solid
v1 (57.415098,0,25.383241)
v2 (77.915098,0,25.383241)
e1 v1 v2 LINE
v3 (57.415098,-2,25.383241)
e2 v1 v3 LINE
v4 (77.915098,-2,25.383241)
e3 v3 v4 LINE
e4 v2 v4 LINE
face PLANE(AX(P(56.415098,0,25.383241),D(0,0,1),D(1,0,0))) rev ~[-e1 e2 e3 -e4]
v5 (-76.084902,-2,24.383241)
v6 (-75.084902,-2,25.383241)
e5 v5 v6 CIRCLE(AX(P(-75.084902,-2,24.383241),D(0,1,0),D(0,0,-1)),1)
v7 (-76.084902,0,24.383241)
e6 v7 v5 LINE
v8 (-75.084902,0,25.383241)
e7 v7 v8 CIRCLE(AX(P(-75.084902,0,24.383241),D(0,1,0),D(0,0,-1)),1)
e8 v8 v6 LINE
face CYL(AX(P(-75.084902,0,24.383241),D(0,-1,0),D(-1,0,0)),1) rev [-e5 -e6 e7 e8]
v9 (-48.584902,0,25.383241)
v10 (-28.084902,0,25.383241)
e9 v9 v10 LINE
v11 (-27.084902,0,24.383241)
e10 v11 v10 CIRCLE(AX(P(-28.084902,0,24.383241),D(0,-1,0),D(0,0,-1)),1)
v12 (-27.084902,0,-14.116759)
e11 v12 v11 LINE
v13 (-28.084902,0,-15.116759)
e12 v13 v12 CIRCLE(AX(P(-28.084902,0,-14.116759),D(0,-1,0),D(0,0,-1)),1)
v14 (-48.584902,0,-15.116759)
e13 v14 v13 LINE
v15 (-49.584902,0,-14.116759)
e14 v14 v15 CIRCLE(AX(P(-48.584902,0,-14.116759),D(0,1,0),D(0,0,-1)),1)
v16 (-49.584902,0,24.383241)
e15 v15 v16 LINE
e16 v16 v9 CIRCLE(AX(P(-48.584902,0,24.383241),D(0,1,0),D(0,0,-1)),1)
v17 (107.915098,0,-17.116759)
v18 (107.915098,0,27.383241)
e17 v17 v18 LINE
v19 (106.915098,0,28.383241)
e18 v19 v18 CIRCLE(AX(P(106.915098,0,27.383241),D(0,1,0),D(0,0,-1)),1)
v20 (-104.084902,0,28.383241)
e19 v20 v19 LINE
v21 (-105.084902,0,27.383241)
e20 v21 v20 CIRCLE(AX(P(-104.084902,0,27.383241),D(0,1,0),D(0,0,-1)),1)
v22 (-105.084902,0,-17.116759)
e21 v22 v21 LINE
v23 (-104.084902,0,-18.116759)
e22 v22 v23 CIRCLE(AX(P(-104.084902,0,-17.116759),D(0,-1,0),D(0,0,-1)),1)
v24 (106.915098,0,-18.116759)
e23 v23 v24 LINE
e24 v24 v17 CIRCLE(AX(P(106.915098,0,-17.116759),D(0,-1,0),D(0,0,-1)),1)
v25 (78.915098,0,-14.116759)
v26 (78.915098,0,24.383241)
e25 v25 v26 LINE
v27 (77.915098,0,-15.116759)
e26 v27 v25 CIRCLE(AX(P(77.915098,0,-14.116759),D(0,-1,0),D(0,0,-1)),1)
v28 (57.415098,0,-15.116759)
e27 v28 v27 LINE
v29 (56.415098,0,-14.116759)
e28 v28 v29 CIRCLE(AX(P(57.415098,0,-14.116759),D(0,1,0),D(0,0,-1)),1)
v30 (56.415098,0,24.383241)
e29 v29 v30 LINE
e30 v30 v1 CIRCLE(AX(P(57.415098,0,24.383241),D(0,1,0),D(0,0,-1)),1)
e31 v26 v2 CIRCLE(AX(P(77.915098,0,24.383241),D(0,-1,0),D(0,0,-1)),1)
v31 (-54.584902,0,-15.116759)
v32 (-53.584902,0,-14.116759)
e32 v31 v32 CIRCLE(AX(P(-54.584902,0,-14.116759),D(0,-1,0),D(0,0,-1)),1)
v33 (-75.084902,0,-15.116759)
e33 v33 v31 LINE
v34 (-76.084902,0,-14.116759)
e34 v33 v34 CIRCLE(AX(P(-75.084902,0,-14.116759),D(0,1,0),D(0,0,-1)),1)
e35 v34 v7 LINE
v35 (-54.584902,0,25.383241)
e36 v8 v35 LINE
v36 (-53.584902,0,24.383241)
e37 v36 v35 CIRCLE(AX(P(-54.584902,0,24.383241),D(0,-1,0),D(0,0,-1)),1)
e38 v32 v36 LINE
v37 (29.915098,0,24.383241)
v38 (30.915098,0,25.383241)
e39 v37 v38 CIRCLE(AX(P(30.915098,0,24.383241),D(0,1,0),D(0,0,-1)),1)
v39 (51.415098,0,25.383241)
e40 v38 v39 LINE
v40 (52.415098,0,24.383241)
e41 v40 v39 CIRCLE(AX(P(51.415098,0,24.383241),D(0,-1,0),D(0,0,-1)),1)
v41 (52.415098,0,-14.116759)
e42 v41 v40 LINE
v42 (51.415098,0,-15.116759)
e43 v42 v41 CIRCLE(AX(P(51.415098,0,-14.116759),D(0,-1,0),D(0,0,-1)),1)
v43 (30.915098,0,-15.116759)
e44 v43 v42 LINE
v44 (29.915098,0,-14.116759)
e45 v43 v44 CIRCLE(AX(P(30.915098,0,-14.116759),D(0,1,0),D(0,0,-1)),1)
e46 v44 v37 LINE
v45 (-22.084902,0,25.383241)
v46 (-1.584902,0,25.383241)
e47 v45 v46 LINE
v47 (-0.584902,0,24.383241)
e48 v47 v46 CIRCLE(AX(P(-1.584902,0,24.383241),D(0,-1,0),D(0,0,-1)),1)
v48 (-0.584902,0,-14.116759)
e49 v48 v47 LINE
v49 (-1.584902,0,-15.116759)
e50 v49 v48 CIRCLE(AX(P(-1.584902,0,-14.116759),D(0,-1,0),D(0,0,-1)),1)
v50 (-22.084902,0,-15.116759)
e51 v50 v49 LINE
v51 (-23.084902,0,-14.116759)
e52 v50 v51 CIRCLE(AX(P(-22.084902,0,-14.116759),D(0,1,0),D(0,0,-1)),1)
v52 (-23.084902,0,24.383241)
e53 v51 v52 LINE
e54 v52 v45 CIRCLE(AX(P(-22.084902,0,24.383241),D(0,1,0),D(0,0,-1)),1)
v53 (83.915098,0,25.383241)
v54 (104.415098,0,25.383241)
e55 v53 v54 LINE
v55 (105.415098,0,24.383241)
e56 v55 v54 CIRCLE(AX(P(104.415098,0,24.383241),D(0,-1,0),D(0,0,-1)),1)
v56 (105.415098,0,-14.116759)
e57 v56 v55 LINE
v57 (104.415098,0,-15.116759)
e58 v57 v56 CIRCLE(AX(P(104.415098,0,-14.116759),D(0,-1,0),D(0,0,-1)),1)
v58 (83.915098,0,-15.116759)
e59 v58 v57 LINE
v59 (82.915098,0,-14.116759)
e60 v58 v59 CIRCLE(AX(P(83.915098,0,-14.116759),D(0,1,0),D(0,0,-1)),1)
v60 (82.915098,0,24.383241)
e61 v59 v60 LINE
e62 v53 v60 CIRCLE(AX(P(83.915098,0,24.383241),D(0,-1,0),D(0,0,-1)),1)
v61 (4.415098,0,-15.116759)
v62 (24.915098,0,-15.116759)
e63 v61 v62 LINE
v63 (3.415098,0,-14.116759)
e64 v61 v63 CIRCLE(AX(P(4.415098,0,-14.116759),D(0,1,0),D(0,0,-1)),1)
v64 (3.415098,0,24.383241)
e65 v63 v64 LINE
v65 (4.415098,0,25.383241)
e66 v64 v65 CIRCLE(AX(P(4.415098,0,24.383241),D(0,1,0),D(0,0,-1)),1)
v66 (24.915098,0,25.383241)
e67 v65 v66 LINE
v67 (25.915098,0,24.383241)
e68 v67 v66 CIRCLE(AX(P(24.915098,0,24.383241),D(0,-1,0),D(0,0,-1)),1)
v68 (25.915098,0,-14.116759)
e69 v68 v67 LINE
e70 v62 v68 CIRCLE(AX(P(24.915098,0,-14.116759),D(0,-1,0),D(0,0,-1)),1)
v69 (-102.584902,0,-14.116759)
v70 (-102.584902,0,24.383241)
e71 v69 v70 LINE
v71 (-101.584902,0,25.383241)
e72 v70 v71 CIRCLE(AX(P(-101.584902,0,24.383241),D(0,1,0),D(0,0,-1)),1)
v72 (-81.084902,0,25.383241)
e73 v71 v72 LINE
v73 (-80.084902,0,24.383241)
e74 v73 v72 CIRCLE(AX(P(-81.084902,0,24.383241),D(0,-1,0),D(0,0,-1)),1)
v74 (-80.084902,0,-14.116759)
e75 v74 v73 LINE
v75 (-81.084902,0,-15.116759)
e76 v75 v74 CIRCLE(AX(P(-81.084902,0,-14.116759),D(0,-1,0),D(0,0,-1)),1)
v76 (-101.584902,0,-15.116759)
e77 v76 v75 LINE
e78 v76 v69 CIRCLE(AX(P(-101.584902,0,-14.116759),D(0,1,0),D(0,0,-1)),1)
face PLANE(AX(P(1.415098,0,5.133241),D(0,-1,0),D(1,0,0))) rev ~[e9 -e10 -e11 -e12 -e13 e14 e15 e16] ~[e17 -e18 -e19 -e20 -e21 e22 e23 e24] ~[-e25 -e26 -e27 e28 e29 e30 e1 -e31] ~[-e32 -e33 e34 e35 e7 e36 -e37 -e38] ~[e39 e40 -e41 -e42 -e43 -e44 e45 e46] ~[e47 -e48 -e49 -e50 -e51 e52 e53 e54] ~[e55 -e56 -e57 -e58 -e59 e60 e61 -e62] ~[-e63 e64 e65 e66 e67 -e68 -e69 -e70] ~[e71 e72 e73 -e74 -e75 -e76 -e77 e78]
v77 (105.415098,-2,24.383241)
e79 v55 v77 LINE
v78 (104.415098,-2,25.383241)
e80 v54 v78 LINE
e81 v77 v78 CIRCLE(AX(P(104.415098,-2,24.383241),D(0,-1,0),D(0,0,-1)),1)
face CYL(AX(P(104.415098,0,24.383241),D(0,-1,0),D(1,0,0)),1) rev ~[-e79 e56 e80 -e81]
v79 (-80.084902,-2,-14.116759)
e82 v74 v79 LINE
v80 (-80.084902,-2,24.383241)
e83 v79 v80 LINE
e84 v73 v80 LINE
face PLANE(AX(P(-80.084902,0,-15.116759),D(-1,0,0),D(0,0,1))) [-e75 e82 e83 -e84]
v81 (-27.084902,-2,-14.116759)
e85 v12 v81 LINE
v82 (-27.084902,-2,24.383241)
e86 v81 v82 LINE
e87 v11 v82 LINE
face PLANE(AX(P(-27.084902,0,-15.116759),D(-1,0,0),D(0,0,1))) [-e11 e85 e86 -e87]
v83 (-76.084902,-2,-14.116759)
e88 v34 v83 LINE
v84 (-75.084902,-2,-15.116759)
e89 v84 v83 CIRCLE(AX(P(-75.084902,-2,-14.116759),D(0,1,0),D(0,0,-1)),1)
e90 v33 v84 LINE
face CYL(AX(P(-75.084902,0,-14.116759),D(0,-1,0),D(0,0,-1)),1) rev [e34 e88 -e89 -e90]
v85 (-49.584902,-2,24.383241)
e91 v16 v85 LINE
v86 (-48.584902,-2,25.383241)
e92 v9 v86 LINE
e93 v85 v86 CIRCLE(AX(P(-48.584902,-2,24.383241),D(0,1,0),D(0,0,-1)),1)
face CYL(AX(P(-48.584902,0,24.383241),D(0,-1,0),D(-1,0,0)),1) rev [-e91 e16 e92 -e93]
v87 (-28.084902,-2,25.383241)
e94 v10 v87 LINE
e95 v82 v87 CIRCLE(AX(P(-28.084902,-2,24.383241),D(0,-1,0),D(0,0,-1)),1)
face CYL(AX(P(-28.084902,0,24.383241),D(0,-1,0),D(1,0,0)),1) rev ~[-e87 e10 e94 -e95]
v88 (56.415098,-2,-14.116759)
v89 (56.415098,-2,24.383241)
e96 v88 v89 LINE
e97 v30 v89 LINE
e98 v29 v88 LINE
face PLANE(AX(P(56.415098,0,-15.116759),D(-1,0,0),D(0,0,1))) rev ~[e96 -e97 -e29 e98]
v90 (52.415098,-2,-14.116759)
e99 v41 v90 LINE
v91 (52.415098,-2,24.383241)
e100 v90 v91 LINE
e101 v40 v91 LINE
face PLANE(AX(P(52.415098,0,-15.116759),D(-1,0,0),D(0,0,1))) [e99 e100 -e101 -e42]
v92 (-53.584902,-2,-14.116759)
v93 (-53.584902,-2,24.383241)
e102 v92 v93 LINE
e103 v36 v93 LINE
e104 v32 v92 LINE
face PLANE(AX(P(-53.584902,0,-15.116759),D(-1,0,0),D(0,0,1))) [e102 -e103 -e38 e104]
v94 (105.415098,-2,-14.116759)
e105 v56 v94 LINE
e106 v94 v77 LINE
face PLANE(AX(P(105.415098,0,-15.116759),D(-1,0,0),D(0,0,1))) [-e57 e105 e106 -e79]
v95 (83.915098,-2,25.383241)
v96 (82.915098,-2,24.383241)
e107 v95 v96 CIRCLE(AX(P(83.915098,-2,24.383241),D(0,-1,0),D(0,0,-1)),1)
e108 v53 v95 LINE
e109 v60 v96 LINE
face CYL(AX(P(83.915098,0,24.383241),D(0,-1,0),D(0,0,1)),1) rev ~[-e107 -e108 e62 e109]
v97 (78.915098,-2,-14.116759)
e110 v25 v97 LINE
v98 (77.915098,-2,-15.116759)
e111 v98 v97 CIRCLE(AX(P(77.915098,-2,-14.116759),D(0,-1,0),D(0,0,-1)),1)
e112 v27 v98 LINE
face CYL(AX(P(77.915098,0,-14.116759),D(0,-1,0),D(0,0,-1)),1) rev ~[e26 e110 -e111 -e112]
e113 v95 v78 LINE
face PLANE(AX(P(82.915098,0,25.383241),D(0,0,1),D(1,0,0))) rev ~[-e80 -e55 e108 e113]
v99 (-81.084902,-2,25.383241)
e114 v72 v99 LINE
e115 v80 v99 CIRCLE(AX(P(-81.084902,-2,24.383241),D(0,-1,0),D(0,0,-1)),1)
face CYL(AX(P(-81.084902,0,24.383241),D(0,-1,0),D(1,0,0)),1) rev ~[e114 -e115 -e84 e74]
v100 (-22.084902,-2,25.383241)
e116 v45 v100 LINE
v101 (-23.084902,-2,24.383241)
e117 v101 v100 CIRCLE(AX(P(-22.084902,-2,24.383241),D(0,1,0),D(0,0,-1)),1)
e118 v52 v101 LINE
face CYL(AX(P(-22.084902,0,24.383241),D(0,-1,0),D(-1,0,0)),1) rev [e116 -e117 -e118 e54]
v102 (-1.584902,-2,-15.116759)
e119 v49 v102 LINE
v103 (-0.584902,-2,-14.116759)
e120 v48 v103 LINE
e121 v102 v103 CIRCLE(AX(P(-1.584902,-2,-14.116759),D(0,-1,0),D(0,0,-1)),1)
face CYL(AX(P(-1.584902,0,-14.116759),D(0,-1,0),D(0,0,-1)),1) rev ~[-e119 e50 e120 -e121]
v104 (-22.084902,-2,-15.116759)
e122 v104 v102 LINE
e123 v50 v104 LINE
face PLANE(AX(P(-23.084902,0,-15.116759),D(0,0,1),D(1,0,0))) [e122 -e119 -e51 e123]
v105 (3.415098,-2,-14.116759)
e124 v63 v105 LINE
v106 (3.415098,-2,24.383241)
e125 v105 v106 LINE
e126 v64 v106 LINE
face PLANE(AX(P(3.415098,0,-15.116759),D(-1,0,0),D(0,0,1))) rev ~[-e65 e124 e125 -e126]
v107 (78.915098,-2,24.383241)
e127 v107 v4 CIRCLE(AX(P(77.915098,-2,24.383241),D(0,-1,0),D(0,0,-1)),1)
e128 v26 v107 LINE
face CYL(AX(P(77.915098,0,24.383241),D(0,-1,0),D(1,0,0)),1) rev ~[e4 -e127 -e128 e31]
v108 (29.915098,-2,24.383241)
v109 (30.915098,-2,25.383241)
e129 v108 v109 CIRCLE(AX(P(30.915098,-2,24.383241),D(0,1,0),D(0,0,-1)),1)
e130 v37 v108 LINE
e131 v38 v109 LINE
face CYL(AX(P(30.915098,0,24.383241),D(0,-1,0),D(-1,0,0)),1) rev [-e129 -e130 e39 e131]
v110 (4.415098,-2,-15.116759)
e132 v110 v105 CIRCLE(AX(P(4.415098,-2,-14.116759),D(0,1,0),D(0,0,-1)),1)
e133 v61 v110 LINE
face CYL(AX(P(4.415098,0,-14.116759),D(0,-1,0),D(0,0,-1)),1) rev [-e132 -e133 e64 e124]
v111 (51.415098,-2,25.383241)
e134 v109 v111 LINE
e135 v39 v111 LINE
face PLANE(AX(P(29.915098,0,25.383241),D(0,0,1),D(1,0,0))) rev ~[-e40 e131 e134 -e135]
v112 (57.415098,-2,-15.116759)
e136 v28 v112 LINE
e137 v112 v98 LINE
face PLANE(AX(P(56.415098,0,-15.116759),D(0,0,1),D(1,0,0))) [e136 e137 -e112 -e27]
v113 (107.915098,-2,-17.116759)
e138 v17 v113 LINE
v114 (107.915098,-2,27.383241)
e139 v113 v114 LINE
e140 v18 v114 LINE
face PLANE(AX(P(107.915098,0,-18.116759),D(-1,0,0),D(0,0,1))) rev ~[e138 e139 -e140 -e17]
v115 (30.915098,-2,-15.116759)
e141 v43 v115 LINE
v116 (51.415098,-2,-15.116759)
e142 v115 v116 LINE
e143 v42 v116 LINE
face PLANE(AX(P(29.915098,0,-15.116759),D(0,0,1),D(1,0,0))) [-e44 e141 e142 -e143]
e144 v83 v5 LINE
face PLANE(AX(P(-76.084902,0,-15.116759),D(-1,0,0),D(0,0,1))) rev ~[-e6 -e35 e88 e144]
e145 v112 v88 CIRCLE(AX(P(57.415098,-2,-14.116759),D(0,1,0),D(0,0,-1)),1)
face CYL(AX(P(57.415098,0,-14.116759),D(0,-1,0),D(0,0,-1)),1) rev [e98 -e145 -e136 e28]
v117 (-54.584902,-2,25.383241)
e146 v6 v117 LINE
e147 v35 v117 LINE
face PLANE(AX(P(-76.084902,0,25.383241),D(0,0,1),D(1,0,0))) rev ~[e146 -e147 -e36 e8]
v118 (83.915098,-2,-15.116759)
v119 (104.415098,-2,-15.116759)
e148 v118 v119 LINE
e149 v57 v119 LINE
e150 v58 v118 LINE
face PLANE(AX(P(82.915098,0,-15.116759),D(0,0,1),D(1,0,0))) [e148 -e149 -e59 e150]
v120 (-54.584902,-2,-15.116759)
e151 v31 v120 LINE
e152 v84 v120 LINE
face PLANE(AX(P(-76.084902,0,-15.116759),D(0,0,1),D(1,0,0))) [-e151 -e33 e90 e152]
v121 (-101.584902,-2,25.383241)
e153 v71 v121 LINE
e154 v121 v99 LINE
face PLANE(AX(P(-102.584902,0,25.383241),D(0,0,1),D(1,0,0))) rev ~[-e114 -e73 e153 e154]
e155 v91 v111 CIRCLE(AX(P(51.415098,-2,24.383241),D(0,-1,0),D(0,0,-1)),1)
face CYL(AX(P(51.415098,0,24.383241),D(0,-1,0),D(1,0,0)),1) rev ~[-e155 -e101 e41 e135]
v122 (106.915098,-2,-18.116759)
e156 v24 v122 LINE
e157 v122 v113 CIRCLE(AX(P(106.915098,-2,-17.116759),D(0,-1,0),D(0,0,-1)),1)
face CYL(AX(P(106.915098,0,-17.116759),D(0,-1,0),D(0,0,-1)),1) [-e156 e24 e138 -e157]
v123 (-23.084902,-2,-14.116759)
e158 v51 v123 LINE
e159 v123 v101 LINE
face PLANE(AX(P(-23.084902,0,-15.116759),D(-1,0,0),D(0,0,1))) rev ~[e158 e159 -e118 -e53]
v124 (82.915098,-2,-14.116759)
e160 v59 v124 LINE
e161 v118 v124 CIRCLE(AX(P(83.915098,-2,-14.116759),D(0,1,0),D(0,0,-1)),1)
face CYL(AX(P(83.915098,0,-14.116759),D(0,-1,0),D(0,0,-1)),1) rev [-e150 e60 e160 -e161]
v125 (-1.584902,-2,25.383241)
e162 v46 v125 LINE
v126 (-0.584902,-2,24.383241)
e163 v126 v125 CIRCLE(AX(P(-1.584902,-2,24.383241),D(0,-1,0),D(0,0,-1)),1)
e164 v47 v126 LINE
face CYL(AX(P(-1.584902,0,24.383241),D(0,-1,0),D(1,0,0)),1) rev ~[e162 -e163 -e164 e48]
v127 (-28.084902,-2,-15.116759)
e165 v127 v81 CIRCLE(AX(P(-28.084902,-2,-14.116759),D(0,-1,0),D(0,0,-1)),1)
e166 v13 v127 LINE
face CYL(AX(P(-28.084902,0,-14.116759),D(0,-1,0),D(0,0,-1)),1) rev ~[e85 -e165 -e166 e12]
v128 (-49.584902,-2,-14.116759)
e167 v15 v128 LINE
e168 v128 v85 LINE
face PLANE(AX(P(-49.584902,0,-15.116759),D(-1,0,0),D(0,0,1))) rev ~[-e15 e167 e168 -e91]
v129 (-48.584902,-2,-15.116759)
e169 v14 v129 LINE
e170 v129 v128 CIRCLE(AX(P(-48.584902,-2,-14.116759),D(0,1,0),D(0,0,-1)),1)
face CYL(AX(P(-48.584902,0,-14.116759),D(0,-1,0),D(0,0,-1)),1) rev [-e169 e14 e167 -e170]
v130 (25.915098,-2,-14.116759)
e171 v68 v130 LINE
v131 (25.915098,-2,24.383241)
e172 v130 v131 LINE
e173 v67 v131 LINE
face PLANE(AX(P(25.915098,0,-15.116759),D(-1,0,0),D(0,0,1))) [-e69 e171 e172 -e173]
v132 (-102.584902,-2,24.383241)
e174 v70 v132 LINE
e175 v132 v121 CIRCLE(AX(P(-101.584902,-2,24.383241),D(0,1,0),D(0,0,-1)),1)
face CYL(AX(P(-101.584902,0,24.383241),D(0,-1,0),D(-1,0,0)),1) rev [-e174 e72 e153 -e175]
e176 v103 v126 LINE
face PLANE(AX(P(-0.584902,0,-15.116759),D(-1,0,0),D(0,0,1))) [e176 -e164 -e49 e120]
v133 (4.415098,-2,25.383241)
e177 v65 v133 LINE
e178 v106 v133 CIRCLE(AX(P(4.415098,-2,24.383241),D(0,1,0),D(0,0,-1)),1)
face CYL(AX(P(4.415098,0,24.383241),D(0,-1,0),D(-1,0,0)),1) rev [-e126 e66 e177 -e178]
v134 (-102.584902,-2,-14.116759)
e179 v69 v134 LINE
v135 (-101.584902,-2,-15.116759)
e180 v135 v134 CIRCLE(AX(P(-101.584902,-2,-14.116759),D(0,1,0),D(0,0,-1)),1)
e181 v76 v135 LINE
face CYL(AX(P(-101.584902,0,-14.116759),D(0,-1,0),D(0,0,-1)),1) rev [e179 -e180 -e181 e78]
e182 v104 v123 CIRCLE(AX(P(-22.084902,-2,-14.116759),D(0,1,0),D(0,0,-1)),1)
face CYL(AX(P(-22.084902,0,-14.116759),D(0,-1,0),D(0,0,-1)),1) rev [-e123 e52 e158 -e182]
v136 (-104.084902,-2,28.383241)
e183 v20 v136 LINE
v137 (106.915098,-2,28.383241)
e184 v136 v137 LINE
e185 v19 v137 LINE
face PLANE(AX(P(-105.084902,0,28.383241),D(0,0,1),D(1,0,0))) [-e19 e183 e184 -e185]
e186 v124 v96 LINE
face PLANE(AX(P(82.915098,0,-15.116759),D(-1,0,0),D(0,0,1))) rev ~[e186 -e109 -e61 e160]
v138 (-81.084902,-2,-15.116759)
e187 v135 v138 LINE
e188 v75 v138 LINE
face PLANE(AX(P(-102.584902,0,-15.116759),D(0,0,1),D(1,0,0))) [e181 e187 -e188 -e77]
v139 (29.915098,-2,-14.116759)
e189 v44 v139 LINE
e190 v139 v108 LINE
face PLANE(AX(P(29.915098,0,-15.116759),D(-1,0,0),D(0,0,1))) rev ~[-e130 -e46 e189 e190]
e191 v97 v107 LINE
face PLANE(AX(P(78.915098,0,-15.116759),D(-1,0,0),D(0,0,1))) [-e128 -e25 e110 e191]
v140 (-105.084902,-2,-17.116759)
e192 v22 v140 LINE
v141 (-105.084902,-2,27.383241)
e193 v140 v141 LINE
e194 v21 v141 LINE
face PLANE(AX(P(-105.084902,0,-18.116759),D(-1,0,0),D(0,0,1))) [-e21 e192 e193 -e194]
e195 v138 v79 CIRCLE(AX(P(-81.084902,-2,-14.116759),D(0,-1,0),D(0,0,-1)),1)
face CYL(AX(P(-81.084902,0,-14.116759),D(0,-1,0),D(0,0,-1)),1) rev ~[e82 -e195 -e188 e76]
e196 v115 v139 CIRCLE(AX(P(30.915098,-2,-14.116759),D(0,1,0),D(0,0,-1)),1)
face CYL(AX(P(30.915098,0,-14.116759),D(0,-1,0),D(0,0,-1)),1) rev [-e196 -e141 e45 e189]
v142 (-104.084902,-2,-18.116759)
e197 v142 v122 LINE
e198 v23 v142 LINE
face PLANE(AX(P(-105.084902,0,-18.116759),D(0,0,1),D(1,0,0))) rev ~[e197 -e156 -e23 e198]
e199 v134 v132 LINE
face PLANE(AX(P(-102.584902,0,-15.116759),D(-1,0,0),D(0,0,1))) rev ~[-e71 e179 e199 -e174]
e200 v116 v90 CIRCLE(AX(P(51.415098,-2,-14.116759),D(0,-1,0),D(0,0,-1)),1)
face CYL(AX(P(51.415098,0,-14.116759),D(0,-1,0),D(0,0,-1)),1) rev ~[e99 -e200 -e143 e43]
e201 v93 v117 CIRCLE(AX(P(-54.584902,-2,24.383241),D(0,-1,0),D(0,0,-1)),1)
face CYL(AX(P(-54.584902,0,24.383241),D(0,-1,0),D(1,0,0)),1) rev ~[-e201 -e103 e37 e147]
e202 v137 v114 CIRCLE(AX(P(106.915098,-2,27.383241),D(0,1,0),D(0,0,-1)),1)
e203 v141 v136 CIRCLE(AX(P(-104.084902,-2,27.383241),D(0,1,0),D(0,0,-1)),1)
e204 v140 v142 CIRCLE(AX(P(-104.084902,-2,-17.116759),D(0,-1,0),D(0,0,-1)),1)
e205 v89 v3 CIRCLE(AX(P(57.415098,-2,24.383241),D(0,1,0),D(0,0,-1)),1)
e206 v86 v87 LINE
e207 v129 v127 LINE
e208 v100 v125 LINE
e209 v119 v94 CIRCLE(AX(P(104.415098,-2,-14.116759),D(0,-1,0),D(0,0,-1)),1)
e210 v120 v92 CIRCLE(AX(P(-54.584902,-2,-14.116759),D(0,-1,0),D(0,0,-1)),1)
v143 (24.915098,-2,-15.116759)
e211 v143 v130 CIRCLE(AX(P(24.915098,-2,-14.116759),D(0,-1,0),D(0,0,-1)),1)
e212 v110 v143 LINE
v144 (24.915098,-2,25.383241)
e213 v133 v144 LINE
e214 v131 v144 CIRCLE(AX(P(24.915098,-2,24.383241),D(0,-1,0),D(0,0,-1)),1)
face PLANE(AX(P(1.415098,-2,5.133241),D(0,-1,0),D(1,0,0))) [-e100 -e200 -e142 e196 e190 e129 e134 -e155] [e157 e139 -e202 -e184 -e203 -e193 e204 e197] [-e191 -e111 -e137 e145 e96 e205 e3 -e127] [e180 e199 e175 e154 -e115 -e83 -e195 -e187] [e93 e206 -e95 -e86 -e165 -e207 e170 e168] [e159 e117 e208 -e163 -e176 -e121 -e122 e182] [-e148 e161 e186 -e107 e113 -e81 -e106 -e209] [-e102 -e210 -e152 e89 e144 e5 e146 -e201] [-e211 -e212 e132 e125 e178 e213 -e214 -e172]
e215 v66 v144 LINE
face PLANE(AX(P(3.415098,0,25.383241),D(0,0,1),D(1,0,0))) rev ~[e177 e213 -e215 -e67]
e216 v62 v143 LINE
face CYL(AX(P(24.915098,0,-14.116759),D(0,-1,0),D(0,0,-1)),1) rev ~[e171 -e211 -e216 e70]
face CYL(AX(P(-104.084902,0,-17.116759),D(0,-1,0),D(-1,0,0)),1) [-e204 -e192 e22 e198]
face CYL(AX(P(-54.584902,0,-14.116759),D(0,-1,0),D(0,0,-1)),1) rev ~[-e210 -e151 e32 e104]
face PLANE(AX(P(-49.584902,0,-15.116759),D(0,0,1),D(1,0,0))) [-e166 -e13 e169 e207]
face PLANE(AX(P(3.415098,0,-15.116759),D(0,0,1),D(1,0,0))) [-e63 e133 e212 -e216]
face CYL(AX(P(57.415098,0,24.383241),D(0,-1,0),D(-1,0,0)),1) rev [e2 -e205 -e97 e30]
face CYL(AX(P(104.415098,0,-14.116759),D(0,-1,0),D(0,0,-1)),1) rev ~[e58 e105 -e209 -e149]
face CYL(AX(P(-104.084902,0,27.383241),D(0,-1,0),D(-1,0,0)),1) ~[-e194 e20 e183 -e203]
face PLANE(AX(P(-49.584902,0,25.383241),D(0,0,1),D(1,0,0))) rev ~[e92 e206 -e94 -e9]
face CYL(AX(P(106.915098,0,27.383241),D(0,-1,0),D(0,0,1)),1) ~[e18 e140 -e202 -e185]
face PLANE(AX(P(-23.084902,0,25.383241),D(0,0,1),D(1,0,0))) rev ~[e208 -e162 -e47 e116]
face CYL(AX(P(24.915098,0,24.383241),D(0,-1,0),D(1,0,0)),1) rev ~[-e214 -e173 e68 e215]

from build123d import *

# Parameters (mm, degrees)
F0_W     = 213
F0_H     = 46.5
F0_W_2   = 22.5
F0_H_2   = 40.5
F1_DEPTH = 2
F2_R     = 1


# Not quite as in the source:
# - a feature names something its author has since deleted; it is built from what else it names


with BuildPart() as f1:
    # F0 (on Front) → F1 (new body)
    with BuildSketch(Plane.XZ):
        with Locations((1.4150981574, 5.1332409506)):
            Rectangle(F0_W, F0_H)
        with Locations((-91.3349018426, 5.1332409506)):
            Rectangle(F0_W_2, F0_H_2, mode=Mode.SUBTRACT)
        with Locations((-64.8349018426, 5.1332409506)):
            Rectangle(F0_W_2, F0_H_2, mode=Mode.SUBTRACT)
        with Locations((-38.3349018426, 5.1332409506)):
            Rectangle(F0_W_2, F0_H_2, mode=Mode.SUBTRACT)
        with Locations((-11.8349018426, 5.1332409506)):
            Rectangle(F0_W_2, F0_H_2, mode=Mode.SUBTRACT)
        with Locations((14.6650981574, 5.1332409506)):
            Rectangle(F0_W_2, F0_H_2, mode=Mode.SUBTRACT)
        with Locations((41.1650981574, 5.1332409506)):
            Rectangle(F0_W_2, F0_H_2, mode=Mode.SUBTRACT)
        with Locations((67.6650981574, 5.1332409506)):
            Rectangle(F0_W_2, F0_H_2, mode=Mode.SUBTRACT)
        with Locations((94.1650981574, 5.1332409506)):
            Rectangle(F0_W_2, F0_H_2, mode=Mode.SUBTRACT)
    extrude(amount=F1_DEPTH)

    # F2
    f2_edges = [f1.edges().sort_by_distance(p)[0] for p in [
        (-80.084902, -1, 25.383241),
        (-102.584902, -1, 25.383241),
        (-80.084902, -1, -15.116759),
        (-102.584902, -1, -15.116759),
        (107.915098, -1, 28.383241),
        (107.915098, -1, -18.116759),
        (-105.084902, -1, 28.383241),
        (-105.084902, -1, -18.116759),
        (-76.084902, -1, 25.383241),
        (-49.584902, -1, 25.383241),
        (-23.084902, -1, 25.383241),
        (3.415098, -1, 25.383241),
        (29.915098, -1, 25.383241),
        (56.415098, -1, 25.383241),
        (82.915098, -1, 25.383241),
        (-53.584902, -1, 25.383241),
        (-27.084902, -1, 25.383241),
        (-0.584902, -1, 25.383241),
        (25.915098, -1, 25.383241),
        (52.415098, -1, 25.383241),
        (78.915098, -1, 25.383241),
        (105.415098, -1, 25.383241),
        (-76.084902, -1, -15.116759),
        (-49.584902, -1, -15.116759),
        (-23.084902, -1, -15.116759),
        (3.415098, -1, -15.116759),
        (29.915098, -1, -15.116759),
        (56.415098, -1, -15.116759),
        (82.915098, -1, -15.116759),
        (-53.584902, -1, -15.116759),
        (-27.084902, -1, -15.116759),
        (-0.584902, -1, -15.116759),
        (25.915098, -1, -15.116759),
        (52.415098, -1, -15.116759),
        (78.915098, -1, -15.116759),
        (105.415098, -1, -15.116759),
    ]]
    fillet(f2_edges, radius=F2_R)


solid = f1.part
